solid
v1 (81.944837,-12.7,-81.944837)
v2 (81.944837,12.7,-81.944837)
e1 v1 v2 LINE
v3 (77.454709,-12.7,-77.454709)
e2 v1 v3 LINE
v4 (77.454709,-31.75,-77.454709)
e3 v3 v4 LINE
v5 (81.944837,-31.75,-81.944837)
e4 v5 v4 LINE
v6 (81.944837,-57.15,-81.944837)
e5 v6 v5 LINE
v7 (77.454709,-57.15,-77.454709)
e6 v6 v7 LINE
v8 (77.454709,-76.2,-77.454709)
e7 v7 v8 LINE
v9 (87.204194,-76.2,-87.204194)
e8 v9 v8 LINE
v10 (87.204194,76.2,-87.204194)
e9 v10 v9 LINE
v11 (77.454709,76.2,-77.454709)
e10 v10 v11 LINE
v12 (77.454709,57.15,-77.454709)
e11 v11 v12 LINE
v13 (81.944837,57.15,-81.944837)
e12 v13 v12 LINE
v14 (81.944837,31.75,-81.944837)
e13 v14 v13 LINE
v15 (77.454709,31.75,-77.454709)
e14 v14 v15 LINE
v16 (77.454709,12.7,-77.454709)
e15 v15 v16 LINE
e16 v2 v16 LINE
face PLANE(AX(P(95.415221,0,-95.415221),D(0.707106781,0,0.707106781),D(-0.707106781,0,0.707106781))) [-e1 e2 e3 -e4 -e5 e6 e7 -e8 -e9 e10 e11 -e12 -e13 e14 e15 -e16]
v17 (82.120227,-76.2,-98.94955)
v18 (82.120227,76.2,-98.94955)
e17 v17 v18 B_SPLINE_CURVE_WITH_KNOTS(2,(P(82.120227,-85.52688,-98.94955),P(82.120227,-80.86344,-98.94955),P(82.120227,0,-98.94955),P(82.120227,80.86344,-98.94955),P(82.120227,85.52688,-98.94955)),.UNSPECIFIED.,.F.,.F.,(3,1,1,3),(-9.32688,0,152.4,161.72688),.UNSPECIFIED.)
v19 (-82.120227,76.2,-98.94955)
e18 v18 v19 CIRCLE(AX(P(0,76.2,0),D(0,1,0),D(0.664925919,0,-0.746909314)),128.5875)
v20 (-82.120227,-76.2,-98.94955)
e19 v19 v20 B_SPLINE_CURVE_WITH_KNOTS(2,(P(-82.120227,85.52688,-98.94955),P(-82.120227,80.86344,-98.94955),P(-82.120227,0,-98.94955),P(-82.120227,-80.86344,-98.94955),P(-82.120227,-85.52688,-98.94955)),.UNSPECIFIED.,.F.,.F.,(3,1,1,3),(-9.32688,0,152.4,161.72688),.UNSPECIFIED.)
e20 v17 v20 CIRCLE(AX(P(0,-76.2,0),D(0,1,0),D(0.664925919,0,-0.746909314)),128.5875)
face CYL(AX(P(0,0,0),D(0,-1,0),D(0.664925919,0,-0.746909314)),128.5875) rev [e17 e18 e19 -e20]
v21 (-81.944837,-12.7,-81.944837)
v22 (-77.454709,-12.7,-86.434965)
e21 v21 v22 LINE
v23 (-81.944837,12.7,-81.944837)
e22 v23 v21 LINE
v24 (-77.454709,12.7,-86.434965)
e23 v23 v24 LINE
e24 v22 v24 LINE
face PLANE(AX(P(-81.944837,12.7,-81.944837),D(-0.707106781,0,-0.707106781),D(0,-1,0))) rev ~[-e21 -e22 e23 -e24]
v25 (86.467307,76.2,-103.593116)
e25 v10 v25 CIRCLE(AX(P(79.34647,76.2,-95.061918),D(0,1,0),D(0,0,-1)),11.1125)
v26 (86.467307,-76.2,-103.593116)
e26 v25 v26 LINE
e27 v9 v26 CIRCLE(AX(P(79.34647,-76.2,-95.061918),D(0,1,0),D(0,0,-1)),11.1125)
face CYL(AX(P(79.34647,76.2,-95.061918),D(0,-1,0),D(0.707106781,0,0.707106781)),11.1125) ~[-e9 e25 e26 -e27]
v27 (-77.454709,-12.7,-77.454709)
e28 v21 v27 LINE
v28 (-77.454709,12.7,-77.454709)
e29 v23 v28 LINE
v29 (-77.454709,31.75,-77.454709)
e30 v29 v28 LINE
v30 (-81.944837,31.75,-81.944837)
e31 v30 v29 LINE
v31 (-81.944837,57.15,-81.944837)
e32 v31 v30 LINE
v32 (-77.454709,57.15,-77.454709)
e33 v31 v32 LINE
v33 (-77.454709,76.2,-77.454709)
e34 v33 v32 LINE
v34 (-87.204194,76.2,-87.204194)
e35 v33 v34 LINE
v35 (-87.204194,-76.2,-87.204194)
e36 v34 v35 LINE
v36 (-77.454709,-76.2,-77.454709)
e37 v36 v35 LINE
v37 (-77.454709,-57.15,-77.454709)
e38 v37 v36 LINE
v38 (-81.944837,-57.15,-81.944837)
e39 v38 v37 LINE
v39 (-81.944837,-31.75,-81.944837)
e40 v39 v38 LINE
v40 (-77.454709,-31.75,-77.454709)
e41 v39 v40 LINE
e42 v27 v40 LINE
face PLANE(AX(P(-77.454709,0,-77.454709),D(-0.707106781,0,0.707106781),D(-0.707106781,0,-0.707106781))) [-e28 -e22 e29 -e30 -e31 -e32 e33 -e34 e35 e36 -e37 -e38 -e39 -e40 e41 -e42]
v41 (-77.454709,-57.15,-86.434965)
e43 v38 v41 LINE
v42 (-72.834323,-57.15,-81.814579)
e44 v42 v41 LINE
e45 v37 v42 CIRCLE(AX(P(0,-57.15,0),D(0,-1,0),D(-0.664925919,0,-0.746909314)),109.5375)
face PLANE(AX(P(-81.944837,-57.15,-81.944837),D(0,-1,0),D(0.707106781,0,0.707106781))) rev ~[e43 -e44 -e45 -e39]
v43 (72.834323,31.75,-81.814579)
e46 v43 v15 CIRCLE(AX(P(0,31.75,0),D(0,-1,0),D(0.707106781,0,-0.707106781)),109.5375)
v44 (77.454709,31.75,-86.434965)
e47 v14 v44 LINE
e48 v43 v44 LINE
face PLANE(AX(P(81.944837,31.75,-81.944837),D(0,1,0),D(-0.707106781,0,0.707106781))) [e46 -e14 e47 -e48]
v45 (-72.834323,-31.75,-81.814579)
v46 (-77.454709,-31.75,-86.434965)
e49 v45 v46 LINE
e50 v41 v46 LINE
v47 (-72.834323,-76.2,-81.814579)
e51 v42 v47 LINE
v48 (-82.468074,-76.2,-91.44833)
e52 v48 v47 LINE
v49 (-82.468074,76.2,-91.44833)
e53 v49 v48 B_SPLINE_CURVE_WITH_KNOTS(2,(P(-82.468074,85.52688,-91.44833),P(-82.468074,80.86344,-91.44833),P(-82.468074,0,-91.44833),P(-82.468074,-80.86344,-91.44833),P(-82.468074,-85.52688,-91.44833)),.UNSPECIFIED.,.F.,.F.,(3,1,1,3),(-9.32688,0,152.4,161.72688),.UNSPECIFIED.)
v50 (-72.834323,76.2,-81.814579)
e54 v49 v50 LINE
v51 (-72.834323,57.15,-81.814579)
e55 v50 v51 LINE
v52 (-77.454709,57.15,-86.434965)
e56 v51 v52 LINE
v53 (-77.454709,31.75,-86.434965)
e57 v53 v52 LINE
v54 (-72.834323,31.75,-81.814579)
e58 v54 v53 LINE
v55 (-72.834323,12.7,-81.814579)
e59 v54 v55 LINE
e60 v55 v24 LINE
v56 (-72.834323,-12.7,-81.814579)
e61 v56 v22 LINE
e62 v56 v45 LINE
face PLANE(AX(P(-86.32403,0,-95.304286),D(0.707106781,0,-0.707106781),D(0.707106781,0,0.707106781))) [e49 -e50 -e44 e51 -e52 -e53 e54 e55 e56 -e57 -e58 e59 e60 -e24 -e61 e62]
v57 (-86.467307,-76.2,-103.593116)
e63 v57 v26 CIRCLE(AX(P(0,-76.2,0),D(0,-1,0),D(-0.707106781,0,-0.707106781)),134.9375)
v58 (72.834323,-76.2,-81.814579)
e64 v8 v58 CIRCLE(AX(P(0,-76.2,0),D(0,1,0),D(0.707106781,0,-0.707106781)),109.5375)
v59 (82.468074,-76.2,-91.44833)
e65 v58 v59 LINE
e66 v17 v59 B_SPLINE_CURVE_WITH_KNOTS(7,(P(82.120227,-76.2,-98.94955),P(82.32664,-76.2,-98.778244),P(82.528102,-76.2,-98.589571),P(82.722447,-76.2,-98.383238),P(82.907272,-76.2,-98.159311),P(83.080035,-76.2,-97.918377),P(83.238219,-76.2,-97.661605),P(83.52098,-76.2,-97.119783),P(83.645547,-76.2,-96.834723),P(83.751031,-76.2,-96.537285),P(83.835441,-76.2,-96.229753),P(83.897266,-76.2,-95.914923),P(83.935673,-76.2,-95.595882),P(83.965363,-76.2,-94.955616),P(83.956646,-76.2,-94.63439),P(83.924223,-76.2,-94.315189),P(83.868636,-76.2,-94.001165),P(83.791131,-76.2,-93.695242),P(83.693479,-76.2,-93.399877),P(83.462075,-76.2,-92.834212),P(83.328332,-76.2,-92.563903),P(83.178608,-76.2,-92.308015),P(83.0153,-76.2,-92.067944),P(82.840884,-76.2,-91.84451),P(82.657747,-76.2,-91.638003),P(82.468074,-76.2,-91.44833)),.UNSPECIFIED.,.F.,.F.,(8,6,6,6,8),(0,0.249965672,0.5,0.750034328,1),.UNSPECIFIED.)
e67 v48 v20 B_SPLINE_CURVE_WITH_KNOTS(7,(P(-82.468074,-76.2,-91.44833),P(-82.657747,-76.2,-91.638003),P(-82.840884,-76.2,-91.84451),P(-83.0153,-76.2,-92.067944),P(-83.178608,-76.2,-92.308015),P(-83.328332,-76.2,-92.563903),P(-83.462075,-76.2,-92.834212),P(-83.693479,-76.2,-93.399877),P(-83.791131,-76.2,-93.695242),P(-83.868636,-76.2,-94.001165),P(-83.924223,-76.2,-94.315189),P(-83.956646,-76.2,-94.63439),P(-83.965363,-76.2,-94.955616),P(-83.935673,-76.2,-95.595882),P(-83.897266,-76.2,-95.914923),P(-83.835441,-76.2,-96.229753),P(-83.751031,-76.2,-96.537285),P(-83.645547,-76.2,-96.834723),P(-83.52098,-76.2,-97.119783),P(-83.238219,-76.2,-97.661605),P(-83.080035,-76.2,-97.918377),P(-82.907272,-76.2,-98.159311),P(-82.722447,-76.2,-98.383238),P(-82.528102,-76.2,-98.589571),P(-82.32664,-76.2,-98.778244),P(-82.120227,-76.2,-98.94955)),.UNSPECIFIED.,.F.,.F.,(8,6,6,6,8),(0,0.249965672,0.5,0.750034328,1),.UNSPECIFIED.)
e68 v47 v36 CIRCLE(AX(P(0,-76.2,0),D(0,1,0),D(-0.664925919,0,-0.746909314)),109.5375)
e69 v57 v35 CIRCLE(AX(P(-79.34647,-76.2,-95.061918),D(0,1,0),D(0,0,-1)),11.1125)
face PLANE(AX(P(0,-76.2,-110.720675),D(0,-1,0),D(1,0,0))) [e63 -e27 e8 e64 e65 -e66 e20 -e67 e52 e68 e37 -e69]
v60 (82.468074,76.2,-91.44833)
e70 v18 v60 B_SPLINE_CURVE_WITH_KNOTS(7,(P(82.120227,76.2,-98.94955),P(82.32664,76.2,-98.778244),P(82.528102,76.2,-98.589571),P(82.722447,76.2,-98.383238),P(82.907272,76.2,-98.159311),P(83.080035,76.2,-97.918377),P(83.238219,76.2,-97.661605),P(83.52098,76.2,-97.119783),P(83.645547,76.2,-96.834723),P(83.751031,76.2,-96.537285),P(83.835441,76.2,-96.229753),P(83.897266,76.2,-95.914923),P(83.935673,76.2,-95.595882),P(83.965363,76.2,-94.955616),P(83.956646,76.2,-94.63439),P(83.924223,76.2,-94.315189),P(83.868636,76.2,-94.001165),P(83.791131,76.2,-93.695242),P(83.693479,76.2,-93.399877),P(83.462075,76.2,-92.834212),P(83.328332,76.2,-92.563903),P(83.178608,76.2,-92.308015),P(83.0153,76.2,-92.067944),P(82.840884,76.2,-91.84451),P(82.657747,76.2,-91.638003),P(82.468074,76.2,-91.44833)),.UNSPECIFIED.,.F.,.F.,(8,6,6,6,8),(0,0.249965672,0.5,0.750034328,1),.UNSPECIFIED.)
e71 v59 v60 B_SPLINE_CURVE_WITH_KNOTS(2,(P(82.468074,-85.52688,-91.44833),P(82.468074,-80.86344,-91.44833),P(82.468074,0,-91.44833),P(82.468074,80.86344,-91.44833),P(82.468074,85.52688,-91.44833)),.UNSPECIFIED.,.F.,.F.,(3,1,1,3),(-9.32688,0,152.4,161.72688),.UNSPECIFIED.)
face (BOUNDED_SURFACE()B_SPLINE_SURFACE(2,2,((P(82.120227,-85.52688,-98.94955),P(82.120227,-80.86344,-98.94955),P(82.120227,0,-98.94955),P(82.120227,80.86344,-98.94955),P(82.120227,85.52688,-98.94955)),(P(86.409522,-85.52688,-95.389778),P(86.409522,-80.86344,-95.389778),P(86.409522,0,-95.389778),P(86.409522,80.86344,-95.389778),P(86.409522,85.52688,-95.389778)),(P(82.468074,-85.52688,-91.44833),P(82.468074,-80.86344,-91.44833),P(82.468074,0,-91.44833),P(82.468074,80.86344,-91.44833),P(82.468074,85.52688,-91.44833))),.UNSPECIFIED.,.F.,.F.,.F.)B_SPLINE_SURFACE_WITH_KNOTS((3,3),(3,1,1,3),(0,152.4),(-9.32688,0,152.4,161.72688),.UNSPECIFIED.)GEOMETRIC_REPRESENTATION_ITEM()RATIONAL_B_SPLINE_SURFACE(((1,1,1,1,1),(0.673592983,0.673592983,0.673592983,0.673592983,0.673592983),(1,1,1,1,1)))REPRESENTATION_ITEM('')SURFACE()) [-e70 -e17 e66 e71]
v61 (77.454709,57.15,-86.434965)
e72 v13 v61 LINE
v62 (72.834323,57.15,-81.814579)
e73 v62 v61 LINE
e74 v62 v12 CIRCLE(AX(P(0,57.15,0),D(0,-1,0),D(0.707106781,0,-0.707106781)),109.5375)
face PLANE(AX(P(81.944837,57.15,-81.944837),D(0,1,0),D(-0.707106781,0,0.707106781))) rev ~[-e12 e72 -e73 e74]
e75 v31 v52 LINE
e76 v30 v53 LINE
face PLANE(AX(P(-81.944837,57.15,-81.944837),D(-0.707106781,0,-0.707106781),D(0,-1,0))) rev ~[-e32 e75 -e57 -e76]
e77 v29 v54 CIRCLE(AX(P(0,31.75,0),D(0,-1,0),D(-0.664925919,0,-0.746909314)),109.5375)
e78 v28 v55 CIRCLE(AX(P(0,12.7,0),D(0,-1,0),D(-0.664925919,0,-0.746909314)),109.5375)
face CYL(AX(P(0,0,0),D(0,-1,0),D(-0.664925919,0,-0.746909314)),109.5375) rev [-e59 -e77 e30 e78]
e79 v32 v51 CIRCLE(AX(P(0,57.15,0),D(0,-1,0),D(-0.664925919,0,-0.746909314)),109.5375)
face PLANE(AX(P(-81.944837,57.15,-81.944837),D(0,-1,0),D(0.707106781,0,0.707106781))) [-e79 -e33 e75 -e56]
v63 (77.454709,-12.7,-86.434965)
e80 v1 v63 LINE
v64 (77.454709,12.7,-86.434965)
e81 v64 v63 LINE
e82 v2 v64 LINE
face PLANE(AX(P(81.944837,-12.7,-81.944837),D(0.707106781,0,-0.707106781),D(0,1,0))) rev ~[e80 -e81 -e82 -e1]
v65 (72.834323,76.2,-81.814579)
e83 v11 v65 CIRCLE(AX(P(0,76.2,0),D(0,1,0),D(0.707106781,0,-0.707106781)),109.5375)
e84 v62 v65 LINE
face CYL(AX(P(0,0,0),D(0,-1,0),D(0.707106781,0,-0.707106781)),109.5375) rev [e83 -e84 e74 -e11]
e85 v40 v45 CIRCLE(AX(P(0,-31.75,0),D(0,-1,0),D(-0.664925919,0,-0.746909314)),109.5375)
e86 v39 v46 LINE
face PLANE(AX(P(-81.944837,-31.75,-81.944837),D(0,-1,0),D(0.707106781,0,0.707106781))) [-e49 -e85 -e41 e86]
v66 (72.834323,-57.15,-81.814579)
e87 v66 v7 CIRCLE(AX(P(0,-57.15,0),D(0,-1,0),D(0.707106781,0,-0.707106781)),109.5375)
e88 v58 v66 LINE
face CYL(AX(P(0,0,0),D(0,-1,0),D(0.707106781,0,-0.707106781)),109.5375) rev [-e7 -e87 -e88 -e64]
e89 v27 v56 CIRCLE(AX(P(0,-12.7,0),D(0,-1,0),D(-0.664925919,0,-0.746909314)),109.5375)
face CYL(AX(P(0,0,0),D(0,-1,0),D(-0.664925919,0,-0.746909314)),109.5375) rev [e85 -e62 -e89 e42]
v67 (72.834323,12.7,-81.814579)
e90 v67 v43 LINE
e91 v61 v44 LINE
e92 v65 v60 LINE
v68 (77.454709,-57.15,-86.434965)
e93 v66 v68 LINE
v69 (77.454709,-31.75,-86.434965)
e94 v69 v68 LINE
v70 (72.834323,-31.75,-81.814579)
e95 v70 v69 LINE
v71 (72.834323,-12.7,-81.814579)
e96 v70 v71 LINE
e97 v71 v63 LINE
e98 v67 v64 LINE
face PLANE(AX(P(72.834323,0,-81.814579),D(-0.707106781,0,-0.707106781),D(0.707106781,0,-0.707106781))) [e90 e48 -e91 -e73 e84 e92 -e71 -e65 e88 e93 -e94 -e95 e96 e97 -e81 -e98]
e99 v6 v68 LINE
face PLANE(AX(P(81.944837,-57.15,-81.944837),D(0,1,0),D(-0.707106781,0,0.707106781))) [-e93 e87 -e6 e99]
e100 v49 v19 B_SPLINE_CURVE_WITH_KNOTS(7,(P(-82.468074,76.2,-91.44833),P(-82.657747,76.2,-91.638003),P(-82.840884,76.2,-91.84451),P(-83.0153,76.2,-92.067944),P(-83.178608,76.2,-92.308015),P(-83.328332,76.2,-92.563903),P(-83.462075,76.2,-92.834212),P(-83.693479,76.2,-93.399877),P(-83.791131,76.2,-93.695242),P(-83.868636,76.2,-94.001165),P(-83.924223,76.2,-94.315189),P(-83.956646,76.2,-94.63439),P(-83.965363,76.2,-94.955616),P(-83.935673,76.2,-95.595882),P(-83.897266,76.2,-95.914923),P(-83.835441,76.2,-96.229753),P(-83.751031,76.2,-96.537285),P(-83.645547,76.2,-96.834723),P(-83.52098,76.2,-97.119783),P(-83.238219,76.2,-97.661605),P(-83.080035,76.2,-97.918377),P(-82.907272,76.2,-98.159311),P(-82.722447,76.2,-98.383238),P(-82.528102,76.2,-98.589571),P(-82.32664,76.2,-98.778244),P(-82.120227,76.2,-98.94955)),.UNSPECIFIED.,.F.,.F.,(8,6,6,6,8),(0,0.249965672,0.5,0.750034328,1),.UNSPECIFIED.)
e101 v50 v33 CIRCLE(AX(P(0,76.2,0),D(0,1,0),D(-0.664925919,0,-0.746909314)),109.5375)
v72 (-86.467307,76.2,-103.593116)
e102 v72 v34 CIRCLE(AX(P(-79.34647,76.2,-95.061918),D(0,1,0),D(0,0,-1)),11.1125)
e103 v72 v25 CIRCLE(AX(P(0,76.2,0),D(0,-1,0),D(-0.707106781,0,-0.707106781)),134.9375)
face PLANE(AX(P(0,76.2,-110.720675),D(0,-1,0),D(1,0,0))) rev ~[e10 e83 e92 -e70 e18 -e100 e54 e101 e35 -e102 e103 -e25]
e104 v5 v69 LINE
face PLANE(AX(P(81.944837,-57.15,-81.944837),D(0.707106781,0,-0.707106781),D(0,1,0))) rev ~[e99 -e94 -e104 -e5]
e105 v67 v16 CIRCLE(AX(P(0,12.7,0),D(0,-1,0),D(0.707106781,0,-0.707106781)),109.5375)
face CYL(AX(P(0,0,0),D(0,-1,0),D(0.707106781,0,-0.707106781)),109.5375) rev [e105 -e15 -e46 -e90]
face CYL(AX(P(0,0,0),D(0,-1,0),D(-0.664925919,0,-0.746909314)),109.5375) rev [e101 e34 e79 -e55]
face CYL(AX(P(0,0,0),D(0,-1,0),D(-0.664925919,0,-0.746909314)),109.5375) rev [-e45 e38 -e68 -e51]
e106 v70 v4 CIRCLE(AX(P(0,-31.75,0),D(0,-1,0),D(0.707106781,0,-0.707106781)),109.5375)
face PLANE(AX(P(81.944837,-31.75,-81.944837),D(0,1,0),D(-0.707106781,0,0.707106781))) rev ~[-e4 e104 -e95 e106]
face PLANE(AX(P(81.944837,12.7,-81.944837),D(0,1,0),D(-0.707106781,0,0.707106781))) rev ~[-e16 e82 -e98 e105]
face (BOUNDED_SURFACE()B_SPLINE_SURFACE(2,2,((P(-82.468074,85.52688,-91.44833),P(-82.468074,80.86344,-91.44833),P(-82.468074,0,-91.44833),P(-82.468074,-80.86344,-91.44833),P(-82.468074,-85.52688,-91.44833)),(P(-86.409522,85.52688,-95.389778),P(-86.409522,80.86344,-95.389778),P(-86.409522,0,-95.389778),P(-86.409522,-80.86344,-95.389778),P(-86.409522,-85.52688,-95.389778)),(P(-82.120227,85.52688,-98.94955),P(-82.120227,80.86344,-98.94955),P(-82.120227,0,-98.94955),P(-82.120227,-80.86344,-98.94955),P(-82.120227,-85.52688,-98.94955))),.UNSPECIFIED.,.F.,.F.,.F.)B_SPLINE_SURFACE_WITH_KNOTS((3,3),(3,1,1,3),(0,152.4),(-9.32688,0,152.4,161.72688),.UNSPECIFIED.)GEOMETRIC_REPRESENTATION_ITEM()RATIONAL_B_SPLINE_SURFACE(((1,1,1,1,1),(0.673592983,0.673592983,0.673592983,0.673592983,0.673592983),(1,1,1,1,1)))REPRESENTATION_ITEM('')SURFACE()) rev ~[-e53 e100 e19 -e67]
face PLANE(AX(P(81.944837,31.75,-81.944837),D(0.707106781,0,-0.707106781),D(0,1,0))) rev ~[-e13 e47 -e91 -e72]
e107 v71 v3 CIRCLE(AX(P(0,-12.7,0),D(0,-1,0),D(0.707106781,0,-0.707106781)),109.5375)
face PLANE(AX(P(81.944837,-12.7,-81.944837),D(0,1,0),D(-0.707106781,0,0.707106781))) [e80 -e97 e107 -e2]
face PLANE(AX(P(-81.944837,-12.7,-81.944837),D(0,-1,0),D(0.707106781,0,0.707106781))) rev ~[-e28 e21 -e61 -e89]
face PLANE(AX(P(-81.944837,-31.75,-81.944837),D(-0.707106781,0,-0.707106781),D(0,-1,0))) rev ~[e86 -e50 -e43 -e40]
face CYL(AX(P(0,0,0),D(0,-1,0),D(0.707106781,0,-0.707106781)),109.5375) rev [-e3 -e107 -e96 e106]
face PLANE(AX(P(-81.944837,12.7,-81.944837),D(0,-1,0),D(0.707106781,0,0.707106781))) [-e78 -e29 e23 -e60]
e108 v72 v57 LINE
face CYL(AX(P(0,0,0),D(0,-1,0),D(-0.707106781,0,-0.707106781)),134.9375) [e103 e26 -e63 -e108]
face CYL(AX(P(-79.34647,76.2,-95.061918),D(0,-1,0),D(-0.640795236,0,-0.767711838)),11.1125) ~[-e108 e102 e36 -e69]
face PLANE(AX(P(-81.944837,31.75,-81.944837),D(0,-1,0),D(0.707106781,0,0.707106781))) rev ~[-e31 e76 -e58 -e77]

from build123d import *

# Parameters (mm, degrees)
F1_DEPTH = 76.2
F2_R     = 11.1125
F3_R     = 5.08
F4_W     = 25.4
F4_H     = 9.6059094062
F4_H_2   = 10.5453204632
F5_DEPTH = 25.4
F6_W     = 25.4
F6_H     = 12.6698460698
F6_H_2   = 15.3897032142
F7_DEPTH = 25.4


with BuildPart() as f1:
    # F0 (on Front) → F1 (new body, symmetric)
    with BuildSketch(Plane.XZ):
        with BuildLine():
            ThreePointArc((85.5011615648, -96.0432013591), (0, -128.5875), (-85.5011615648, -96.0432013591))
            ThreePointArc((-85.5011615648, -96.0432013591), (-85.91339025, -95.6746284654), (-86.3240301315, -95.3042862526))
            Line((-86.3240301315, -95.3042862526), (-72.8343228145, -81.8145789356))
            ThreePointArc((-72.8343228145, -81.8145789356), (-75.1761291277, -79.6681461792), (-77.4547090442, -77.4547090442))
            Line((-77.4547090442, -77.4547090442), (-90.9250932258, -90.9250932258))
            Line((-90.9250932258, -90.9250932258), (-95.4152212864, -95.4152212864))
            ThreePointArc((-95.4152212864, -95.4152212864), (0, -134.9375), (95.4152212864, -95.4152212864))
            Line((95.4152212864, -95.4152212864), (77.4547090442, -77.4547090442))
            ThreePointArc((77.4547090442, -77.4547090442), (75.1761291277, -79.6681461792), (72.8343228145, -81.8145789356))
            Line((72.8343228145, -81.8145789356), (86.3240301315, -95.3042862526))
            ThreePointArc((86.3240301315, -95.3042862526), (85.91339025, -95.6746284654), (85.5011615648, -96.0432013591))
        make_face()
    extrude(amount=F1_DEPTH, both=True)

    # F2
    f2_edges = [f1.edges().sort_by_distance(p)[0] for p in [
        (95.415221, 0, -95.415221),
        (-95.415221, 0, -95.415221),
    ]]
    fillet(f2_edges, radius=F2_R)

    # F3
    f3_edges = [f1.edges().sort_by_distance(p)[0] for p in [
        (-86.32403, 0, -95.304286),
        (86.32403, 0, -95.304286),
    ]]
    fillet(f3_edges, radius=F3_R)

    # F4 (on face) → F5 (cut)
    with BuildSketch(Plane(origin=(0, 0, 0), x_dir=(0, 1, 0), z_dir=(0.7071067812, 0, 0.7071067812))):
        with Locations((-44.45, -111.0845452969)):
            Rectangle(F4_W, F4_H)
        with Locations((44.45, -111.0845452969)):
            Rectangle(F4_W, F4_H)
        with Locations((0, -110.6148397684)):
            Rectangle(F4_W, F4_H_2)
    extrude(amount=-F5_DEPTH, mode=Mode.SUBTRACT)

    # F6 (on face) → F7 (cut)
    with BuildSketch(Plane(origin=(0, 0, 0), x_dir=(0, -1, 0), z_dir=(-0.7071067812, 0, 0.7071067812))):
        with Locations((-44.45, -109.5525769651)):
            Rectangle(F6_W, F6_H)
        with Locations((44.45, -109.5525769651)):
            Rectangle(F6_W, F6_H)
        with Locations((0, -108.1926483929)):
            Rectangle(F6_W, F6_H_2)
    extrude(amount=-F7_DEPTH, mode=Mode.SUBTRACT)


solid = f1.part
